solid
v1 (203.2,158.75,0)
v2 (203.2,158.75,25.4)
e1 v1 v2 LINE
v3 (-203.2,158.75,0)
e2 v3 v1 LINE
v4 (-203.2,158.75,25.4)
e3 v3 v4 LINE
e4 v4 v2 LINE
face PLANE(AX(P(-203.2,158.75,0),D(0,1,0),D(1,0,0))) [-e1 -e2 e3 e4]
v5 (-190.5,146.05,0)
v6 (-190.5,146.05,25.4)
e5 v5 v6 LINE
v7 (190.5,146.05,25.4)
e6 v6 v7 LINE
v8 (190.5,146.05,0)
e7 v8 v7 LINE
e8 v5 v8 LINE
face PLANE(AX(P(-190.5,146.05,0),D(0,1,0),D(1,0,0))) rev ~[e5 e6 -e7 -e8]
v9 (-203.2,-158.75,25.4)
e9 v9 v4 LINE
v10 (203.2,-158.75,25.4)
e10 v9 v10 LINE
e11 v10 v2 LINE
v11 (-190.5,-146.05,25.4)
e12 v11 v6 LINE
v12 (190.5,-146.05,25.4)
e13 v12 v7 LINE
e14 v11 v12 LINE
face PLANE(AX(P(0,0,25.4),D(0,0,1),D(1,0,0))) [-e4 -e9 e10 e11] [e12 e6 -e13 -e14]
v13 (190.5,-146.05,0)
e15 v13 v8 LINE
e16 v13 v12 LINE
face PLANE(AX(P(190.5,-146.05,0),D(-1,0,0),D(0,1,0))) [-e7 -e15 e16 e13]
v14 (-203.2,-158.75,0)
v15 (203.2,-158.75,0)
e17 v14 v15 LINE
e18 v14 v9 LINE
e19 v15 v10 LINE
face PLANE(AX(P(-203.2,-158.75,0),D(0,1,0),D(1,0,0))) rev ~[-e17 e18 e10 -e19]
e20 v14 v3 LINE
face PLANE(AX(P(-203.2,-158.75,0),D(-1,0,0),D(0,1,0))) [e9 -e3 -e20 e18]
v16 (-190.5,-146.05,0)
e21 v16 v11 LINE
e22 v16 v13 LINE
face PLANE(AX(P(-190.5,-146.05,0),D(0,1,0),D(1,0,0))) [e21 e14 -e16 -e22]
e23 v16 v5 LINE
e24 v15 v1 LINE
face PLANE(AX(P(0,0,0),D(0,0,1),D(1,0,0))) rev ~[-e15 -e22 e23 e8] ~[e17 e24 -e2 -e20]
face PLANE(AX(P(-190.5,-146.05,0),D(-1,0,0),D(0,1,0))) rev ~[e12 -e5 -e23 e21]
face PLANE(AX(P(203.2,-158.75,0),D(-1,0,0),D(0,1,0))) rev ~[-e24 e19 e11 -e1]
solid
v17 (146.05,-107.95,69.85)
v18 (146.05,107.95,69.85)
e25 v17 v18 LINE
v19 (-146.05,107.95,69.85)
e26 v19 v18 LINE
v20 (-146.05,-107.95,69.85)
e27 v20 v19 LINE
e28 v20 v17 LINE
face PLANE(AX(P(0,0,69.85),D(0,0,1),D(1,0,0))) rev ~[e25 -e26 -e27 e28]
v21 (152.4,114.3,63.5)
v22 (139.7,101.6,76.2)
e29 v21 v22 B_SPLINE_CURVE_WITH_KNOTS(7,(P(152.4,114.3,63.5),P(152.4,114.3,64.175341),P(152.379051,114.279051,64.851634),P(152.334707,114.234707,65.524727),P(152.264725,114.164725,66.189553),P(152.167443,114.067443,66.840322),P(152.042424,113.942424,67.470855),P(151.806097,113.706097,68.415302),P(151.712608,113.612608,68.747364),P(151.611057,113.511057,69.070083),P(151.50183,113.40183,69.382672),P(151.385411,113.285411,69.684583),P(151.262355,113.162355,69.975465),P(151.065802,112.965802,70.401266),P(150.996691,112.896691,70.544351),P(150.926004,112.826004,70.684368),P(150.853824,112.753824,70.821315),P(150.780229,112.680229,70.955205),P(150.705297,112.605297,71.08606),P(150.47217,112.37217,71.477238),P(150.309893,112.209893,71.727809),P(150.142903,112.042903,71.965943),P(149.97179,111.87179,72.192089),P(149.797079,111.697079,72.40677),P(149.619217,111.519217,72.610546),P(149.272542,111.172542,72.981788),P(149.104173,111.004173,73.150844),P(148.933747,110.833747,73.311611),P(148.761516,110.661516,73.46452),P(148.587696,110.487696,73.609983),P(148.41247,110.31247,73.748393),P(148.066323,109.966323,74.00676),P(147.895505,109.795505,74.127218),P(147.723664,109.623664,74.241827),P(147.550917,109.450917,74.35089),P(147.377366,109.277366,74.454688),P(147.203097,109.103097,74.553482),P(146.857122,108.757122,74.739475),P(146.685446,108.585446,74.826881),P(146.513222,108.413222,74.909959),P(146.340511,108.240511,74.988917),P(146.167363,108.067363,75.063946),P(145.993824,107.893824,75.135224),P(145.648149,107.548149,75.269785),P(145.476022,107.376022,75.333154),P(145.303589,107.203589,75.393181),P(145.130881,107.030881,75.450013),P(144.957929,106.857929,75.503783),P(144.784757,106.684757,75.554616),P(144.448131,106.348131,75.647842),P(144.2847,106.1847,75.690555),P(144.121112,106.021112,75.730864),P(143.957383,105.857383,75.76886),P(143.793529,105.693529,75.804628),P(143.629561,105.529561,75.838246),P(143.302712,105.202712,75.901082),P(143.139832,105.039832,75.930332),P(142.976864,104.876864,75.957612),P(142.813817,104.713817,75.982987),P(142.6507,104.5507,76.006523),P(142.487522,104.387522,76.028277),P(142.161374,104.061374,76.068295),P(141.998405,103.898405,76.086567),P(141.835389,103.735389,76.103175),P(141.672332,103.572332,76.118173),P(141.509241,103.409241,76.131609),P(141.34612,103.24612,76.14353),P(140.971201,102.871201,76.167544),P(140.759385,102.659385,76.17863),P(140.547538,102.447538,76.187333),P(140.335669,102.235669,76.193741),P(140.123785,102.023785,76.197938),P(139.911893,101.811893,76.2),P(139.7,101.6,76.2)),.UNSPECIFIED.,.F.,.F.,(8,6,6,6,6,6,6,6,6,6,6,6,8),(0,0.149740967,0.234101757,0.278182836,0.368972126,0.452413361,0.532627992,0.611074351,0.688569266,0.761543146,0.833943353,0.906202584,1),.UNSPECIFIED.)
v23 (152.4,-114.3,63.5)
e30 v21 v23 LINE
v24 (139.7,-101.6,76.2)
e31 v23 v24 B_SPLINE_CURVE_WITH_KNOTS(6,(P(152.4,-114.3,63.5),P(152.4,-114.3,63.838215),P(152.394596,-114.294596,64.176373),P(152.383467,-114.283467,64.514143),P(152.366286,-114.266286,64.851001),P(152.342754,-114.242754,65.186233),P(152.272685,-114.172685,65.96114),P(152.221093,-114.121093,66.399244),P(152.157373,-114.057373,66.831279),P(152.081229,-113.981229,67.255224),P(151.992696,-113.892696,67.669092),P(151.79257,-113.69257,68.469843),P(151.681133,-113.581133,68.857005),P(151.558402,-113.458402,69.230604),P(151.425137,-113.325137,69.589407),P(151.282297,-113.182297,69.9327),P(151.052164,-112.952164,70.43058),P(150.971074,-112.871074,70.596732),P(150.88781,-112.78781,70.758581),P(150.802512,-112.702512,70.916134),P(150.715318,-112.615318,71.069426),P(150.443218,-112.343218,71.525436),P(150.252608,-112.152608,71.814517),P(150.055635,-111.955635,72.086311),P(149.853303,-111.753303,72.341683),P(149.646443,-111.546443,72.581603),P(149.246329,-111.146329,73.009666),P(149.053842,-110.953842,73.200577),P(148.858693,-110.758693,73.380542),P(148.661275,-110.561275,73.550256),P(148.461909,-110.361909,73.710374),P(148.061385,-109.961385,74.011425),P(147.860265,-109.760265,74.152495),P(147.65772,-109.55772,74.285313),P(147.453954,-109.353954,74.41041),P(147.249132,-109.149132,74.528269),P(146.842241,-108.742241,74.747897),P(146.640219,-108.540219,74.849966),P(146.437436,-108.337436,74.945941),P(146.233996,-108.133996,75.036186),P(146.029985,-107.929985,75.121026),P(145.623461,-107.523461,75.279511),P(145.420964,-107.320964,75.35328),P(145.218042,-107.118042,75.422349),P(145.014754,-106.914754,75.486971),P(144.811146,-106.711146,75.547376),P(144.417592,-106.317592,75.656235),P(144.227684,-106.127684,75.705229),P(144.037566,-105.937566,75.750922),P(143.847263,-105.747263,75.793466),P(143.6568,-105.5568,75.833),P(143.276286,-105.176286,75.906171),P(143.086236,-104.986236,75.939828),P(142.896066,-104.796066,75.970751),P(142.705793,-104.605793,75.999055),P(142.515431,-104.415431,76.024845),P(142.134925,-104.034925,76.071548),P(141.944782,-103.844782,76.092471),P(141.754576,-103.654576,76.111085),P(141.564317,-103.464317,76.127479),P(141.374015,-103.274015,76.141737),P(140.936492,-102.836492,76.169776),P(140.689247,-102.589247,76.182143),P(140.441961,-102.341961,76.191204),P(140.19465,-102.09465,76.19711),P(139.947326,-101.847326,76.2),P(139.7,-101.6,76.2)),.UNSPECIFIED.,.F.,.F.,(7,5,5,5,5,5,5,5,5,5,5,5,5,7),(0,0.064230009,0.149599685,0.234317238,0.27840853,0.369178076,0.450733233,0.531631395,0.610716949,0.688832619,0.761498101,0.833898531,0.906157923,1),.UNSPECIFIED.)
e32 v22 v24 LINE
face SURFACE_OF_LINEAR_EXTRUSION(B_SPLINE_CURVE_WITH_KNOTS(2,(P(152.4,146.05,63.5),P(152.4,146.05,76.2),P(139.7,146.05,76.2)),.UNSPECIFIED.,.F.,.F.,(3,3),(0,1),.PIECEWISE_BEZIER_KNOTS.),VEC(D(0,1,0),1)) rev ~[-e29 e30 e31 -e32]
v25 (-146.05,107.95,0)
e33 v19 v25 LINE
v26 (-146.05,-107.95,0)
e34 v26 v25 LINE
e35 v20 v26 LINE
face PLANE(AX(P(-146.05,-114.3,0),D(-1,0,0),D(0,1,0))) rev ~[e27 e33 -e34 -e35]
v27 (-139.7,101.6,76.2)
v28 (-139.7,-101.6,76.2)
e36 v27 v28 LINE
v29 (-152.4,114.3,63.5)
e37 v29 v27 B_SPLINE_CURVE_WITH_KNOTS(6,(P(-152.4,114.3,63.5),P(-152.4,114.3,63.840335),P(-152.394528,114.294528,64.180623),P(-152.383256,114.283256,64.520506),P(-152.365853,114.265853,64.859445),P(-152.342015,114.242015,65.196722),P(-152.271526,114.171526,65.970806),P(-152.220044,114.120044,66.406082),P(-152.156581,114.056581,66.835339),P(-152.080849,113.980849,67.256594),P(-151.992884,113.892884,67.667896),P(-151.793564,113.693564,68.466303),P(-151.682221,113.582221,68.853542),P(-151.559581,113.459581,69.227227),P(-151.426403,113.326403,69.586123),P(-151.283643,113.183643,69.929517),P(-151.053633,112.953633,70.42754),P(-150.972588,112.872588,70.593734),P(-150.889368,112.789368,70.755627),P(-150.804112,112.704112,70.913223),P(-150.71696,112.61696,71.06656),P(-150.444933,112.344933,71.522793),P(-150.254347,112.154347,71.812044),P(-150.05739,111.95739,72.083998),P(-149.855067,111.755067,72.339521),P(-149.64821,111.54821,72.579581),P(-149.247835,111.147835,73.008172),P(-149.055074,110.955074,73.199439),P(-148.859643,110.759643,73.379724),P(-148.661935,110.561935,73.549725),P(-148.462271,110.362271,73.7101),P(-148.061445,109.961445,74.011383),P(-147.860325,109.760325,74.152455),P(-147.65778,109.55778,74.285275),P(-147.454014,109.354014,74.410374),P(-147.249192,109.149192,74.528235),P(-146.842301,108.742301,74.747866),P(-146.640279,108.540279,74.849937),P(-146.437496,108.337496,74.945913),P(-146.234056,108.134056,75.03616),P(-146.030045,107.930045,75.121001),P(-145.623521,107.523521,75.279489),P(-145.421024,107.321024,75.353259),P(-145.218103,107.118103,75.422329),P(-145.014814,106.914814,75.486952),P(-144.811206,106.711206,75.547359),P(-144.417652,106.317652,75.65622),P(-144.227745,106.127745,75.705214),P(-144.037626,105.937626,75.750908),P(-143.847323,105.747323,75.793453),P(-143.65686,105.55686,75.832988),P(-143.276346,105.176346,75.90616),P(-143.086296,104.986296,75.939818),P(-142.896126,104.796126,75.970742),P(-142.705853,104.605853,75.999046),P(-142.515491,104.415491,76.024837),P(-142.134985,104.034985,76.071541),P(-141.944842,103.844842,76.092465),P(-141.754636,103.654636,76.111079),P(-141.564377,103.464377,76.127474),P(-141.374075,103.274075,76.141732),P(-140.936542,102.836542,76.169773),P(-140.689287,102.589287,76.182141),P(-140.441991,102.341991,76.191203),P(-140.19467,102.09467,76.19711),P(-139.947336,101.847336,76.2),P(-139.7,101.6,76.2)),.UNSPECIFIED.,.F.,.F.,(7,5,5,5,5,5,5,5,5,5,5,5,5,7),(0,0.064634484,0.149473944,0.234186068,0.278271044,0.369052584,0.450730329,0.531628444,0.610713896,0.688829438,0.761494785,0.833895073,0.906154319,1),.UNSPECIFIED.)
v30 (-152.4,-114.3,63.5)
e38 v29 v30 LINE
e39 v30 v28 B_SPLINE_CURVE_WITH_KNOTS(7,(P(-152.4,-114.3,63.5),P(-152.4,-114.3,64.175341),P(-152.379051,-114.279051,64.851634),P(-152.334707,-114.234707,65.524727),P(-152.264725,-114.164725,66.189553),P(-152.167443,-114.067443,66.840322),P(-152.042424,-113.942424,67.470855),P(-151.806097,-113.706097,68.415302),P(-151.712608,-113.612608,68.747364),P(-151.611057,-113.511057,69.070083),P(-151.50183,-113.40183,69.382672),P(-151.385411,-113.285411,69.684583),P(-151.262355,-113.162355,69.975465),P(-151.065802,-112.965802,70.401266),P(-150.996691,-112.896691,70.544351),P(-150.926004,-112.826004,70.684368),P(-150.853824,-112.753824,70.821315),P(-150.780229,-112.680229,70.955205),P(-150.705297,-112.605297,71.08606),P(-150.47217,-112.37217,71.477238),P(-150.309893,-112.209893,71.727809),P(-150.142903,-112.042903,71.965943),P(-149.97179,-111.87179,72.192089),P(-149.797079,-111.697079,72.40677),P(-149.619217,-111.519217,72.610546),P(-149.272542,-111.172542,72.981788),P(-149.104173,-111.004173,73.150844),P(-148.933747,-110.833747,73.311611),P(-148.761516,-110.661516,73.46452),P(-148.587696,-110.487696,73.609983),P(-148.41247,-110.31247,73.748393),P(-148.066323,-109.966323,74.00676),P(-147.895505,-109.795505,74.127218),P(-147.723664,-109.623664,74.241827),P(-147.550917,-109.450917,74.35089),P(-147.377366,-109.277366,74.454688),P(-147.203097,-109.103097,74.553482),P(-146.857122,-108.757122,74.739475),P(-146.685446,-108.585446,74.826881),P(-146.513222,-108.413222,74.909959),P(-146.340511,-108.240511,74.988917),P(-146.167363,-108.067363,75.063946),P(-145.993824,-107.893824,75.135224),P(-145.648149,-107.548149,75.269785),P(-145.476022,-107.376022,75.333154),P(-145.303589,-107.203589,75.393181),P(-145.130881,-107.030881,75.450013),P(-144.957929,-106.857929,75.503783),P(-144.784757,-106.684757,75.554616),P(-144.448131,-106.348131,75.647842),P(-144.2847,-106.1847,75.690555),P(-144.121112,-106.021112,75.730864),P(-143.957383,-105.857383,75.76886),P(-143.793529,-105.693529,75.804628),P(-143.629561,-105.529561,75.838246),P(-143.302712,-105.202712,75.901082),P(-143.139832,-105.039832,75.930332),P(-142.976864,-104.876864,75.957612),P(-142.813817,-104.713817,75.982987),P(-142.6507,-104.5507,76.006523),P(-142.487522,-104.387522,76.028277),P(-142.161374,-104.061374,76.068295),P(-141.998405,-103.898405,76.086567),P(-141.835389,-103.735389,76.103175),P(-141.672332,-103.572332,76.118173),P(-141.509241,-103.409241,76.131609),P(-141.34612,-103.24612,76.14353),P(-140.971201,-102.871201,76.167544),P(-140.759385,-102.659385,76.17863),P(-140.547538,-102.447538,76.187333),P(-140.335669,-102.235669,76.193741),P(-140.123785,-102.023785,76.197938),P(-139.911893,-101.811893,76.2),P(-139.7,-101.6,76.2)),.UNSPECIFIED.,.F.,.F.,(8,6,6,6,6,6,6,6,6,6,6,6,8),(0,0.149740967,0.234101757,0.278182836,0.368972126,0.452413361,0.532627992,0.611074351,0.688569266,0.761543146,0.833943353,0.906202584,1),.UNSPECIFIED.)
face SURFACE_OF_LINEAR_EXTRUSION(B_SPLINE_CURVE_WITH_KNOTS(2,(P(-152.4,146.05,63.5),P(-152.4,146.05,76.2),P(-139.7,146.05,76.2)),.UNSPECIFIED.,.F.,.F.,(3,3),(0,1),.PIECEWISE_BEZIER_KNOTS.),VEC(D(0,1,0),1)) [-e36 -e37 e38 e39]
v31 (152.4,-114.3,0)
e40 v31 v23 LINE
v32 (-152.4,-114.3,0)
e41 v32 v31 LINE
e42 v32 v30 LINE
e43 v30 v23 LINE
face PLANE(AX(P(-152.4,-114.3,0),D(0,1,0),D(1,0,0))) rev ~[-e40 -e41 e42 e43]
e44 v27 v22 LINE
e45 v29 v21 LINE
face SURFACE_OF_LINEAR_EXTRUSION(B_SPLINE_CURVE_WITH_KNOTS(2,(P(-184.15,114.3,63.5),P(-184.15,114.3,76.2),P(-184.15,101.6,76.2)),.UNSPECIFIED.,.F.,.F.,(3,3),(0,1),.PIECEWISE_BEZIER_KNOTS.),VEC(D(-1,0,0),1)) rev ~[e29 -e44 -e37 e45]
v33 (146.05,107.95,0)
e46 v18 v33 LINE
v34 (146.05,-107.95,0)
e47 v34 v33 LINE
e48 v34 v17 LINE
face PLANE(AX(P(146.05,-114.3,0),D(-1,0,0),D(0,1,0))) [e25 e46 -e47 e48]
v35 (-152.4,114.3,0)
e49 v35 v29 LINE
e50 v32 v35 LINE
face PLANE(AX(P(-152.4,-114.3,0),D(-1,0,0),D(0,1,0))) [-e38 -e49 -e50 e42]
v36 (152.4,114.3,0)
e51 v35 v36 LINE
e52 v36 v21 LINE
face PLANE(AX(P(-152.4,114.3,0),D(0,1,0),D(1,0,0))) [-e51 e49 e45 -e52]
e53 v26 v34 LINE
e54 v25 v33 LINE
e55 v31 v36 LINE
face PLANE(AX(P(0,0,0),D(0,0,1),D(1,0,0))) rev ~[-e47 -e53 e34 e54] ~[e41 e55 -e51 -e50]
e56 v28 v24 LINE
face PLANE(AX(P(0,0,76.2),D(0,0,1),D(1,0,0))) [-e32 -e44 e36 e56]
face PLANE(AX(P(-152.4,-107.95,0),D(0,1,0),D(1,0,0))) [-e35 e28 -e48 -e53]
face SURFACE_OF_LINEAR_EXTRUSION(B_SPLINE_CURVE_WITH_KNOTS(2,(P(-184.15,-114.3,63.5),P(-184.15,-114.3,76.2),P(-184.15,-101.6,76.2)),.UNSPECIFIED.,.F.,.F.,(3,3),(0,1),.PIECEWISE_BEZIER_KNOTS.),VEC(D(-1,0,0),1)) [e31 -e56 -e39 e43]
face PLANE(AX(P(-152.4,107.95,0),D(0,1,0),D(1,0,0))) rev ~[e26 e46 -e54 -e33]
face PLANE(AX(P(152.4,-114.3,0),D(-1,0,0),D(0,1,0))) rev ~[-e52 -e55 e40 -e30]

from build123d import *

# Parameters (mm, degrees)
F0_W        = 304.8
F0_H        = 228.6
F1_DEPTH    = 76.2
F2_T        = -6.35
F3_T1_DEPTH = 368.3
F3_T3_DEPTH = 292.1
F4_W        = 406.4
F4_H        = 317.5
F4_W_2      = 381
F4_H_2      = 292.1
F5_DEPTH    = 25.4


# Not quite as in the source:
# - a fillet or chamfer that OpenCascade refuses, or shapes differently, is made with other operations: its cross-section is extruded or revolved along the edge and cut away or added


with BuildPart() as f1:
    # F0 (on Top) → F1 (new body)
    with BuildSketch(Plane.XY):
        Rectangle(F0_W, F0_H)
    extrude(amount=F1_DEPTH)

    # F2
    f2_openings = [f1.faces().sort_by_distance(p)[0] for p in [
        (0, 0, 0),
    ]]
    offset(amount=F2_T, openings=f2_openings)

    # F3: fillet of radius 12.7 on 4 edges, made by hand

    # F3_s2 → F3_t1 (cut)
    with BuildSketch(Plane.YZ.offset(-184.15)):
        with BuildLine():
            add(Edge.make_bspline(
                [(-114.3, 63.5), (-114.3, 76.2), (-101.6, 76.2)],
                knots=[0, 0, 0, 1, 1, 1], degree=2, weights=[1, 1, 1]))
            Line((-101.6, 76.2), (-114.3, 76.2))
            Line((-114.3, 76.2), (-114.3, 63.5))
        make_face()
        with BuildLine():
            add(Edge.make_bspline(
                [(114.3, 63.5), (114.3, 76.2), (101.6, 76.2)],
                knots=[0, 0, 0, 1, 1, 1], degree=2, weights=[1, 1, 1]))
            Line((101.6, 76.2), (114.3, 76.2))
            Line((114.3, 76.2), (114.3, 63.5))
        make_face()
    extrude(amount=F3_T1_DEPTH, mode=Mode.SUBTRACT)

    # F3_s4 → F3_t3 (cut)
    with BuildSketch(Plane.XZ.offset(-146.05)):
        with BuildLine():
            add(Edge.make_bspline(
                [(152.4, 63.5), (152.4, 76.2), (139.7, 76.2)],
                knots=[0, 0, 0, 1, 1, 1], degree=2, weights=[1, 1, 1]))
            Line((139.7, 76.2), (152.4, 76.2))
            Line((152.4, 76.2), (152.4, 63.5))
        make_face()
        with BuildLine():
            add(Edge.make_bspline(
                [(-152.4, 63.5), (-152.4, 76.2), (-139.7, 76.2)],
                knots=[0, 0, 0, 1, 1, 1], degree=2, weights=[1, 1, 1]))
            Line((-139.7, 76.2), (-152.4, 76.2))
            Line((-152.4, 76.2), (-152.4, 63.5))
        make_face()
    extrude(amount=F3_T3_DEPTH, mode=Mode.SUBTRACT)


with BuildPart() as f5:
    # F4 (on Top) → F5 (new body)
    with BuildSketch(Plane.XY):
        Rectangle(F4_W, F4_H)
        Rectangle(F4_W_2, F4_H_2, mode=Mode.SUBTRACT)
    extrude(amount=F5_DEPTH)


solid = Compound([f1.part, f5.part])
